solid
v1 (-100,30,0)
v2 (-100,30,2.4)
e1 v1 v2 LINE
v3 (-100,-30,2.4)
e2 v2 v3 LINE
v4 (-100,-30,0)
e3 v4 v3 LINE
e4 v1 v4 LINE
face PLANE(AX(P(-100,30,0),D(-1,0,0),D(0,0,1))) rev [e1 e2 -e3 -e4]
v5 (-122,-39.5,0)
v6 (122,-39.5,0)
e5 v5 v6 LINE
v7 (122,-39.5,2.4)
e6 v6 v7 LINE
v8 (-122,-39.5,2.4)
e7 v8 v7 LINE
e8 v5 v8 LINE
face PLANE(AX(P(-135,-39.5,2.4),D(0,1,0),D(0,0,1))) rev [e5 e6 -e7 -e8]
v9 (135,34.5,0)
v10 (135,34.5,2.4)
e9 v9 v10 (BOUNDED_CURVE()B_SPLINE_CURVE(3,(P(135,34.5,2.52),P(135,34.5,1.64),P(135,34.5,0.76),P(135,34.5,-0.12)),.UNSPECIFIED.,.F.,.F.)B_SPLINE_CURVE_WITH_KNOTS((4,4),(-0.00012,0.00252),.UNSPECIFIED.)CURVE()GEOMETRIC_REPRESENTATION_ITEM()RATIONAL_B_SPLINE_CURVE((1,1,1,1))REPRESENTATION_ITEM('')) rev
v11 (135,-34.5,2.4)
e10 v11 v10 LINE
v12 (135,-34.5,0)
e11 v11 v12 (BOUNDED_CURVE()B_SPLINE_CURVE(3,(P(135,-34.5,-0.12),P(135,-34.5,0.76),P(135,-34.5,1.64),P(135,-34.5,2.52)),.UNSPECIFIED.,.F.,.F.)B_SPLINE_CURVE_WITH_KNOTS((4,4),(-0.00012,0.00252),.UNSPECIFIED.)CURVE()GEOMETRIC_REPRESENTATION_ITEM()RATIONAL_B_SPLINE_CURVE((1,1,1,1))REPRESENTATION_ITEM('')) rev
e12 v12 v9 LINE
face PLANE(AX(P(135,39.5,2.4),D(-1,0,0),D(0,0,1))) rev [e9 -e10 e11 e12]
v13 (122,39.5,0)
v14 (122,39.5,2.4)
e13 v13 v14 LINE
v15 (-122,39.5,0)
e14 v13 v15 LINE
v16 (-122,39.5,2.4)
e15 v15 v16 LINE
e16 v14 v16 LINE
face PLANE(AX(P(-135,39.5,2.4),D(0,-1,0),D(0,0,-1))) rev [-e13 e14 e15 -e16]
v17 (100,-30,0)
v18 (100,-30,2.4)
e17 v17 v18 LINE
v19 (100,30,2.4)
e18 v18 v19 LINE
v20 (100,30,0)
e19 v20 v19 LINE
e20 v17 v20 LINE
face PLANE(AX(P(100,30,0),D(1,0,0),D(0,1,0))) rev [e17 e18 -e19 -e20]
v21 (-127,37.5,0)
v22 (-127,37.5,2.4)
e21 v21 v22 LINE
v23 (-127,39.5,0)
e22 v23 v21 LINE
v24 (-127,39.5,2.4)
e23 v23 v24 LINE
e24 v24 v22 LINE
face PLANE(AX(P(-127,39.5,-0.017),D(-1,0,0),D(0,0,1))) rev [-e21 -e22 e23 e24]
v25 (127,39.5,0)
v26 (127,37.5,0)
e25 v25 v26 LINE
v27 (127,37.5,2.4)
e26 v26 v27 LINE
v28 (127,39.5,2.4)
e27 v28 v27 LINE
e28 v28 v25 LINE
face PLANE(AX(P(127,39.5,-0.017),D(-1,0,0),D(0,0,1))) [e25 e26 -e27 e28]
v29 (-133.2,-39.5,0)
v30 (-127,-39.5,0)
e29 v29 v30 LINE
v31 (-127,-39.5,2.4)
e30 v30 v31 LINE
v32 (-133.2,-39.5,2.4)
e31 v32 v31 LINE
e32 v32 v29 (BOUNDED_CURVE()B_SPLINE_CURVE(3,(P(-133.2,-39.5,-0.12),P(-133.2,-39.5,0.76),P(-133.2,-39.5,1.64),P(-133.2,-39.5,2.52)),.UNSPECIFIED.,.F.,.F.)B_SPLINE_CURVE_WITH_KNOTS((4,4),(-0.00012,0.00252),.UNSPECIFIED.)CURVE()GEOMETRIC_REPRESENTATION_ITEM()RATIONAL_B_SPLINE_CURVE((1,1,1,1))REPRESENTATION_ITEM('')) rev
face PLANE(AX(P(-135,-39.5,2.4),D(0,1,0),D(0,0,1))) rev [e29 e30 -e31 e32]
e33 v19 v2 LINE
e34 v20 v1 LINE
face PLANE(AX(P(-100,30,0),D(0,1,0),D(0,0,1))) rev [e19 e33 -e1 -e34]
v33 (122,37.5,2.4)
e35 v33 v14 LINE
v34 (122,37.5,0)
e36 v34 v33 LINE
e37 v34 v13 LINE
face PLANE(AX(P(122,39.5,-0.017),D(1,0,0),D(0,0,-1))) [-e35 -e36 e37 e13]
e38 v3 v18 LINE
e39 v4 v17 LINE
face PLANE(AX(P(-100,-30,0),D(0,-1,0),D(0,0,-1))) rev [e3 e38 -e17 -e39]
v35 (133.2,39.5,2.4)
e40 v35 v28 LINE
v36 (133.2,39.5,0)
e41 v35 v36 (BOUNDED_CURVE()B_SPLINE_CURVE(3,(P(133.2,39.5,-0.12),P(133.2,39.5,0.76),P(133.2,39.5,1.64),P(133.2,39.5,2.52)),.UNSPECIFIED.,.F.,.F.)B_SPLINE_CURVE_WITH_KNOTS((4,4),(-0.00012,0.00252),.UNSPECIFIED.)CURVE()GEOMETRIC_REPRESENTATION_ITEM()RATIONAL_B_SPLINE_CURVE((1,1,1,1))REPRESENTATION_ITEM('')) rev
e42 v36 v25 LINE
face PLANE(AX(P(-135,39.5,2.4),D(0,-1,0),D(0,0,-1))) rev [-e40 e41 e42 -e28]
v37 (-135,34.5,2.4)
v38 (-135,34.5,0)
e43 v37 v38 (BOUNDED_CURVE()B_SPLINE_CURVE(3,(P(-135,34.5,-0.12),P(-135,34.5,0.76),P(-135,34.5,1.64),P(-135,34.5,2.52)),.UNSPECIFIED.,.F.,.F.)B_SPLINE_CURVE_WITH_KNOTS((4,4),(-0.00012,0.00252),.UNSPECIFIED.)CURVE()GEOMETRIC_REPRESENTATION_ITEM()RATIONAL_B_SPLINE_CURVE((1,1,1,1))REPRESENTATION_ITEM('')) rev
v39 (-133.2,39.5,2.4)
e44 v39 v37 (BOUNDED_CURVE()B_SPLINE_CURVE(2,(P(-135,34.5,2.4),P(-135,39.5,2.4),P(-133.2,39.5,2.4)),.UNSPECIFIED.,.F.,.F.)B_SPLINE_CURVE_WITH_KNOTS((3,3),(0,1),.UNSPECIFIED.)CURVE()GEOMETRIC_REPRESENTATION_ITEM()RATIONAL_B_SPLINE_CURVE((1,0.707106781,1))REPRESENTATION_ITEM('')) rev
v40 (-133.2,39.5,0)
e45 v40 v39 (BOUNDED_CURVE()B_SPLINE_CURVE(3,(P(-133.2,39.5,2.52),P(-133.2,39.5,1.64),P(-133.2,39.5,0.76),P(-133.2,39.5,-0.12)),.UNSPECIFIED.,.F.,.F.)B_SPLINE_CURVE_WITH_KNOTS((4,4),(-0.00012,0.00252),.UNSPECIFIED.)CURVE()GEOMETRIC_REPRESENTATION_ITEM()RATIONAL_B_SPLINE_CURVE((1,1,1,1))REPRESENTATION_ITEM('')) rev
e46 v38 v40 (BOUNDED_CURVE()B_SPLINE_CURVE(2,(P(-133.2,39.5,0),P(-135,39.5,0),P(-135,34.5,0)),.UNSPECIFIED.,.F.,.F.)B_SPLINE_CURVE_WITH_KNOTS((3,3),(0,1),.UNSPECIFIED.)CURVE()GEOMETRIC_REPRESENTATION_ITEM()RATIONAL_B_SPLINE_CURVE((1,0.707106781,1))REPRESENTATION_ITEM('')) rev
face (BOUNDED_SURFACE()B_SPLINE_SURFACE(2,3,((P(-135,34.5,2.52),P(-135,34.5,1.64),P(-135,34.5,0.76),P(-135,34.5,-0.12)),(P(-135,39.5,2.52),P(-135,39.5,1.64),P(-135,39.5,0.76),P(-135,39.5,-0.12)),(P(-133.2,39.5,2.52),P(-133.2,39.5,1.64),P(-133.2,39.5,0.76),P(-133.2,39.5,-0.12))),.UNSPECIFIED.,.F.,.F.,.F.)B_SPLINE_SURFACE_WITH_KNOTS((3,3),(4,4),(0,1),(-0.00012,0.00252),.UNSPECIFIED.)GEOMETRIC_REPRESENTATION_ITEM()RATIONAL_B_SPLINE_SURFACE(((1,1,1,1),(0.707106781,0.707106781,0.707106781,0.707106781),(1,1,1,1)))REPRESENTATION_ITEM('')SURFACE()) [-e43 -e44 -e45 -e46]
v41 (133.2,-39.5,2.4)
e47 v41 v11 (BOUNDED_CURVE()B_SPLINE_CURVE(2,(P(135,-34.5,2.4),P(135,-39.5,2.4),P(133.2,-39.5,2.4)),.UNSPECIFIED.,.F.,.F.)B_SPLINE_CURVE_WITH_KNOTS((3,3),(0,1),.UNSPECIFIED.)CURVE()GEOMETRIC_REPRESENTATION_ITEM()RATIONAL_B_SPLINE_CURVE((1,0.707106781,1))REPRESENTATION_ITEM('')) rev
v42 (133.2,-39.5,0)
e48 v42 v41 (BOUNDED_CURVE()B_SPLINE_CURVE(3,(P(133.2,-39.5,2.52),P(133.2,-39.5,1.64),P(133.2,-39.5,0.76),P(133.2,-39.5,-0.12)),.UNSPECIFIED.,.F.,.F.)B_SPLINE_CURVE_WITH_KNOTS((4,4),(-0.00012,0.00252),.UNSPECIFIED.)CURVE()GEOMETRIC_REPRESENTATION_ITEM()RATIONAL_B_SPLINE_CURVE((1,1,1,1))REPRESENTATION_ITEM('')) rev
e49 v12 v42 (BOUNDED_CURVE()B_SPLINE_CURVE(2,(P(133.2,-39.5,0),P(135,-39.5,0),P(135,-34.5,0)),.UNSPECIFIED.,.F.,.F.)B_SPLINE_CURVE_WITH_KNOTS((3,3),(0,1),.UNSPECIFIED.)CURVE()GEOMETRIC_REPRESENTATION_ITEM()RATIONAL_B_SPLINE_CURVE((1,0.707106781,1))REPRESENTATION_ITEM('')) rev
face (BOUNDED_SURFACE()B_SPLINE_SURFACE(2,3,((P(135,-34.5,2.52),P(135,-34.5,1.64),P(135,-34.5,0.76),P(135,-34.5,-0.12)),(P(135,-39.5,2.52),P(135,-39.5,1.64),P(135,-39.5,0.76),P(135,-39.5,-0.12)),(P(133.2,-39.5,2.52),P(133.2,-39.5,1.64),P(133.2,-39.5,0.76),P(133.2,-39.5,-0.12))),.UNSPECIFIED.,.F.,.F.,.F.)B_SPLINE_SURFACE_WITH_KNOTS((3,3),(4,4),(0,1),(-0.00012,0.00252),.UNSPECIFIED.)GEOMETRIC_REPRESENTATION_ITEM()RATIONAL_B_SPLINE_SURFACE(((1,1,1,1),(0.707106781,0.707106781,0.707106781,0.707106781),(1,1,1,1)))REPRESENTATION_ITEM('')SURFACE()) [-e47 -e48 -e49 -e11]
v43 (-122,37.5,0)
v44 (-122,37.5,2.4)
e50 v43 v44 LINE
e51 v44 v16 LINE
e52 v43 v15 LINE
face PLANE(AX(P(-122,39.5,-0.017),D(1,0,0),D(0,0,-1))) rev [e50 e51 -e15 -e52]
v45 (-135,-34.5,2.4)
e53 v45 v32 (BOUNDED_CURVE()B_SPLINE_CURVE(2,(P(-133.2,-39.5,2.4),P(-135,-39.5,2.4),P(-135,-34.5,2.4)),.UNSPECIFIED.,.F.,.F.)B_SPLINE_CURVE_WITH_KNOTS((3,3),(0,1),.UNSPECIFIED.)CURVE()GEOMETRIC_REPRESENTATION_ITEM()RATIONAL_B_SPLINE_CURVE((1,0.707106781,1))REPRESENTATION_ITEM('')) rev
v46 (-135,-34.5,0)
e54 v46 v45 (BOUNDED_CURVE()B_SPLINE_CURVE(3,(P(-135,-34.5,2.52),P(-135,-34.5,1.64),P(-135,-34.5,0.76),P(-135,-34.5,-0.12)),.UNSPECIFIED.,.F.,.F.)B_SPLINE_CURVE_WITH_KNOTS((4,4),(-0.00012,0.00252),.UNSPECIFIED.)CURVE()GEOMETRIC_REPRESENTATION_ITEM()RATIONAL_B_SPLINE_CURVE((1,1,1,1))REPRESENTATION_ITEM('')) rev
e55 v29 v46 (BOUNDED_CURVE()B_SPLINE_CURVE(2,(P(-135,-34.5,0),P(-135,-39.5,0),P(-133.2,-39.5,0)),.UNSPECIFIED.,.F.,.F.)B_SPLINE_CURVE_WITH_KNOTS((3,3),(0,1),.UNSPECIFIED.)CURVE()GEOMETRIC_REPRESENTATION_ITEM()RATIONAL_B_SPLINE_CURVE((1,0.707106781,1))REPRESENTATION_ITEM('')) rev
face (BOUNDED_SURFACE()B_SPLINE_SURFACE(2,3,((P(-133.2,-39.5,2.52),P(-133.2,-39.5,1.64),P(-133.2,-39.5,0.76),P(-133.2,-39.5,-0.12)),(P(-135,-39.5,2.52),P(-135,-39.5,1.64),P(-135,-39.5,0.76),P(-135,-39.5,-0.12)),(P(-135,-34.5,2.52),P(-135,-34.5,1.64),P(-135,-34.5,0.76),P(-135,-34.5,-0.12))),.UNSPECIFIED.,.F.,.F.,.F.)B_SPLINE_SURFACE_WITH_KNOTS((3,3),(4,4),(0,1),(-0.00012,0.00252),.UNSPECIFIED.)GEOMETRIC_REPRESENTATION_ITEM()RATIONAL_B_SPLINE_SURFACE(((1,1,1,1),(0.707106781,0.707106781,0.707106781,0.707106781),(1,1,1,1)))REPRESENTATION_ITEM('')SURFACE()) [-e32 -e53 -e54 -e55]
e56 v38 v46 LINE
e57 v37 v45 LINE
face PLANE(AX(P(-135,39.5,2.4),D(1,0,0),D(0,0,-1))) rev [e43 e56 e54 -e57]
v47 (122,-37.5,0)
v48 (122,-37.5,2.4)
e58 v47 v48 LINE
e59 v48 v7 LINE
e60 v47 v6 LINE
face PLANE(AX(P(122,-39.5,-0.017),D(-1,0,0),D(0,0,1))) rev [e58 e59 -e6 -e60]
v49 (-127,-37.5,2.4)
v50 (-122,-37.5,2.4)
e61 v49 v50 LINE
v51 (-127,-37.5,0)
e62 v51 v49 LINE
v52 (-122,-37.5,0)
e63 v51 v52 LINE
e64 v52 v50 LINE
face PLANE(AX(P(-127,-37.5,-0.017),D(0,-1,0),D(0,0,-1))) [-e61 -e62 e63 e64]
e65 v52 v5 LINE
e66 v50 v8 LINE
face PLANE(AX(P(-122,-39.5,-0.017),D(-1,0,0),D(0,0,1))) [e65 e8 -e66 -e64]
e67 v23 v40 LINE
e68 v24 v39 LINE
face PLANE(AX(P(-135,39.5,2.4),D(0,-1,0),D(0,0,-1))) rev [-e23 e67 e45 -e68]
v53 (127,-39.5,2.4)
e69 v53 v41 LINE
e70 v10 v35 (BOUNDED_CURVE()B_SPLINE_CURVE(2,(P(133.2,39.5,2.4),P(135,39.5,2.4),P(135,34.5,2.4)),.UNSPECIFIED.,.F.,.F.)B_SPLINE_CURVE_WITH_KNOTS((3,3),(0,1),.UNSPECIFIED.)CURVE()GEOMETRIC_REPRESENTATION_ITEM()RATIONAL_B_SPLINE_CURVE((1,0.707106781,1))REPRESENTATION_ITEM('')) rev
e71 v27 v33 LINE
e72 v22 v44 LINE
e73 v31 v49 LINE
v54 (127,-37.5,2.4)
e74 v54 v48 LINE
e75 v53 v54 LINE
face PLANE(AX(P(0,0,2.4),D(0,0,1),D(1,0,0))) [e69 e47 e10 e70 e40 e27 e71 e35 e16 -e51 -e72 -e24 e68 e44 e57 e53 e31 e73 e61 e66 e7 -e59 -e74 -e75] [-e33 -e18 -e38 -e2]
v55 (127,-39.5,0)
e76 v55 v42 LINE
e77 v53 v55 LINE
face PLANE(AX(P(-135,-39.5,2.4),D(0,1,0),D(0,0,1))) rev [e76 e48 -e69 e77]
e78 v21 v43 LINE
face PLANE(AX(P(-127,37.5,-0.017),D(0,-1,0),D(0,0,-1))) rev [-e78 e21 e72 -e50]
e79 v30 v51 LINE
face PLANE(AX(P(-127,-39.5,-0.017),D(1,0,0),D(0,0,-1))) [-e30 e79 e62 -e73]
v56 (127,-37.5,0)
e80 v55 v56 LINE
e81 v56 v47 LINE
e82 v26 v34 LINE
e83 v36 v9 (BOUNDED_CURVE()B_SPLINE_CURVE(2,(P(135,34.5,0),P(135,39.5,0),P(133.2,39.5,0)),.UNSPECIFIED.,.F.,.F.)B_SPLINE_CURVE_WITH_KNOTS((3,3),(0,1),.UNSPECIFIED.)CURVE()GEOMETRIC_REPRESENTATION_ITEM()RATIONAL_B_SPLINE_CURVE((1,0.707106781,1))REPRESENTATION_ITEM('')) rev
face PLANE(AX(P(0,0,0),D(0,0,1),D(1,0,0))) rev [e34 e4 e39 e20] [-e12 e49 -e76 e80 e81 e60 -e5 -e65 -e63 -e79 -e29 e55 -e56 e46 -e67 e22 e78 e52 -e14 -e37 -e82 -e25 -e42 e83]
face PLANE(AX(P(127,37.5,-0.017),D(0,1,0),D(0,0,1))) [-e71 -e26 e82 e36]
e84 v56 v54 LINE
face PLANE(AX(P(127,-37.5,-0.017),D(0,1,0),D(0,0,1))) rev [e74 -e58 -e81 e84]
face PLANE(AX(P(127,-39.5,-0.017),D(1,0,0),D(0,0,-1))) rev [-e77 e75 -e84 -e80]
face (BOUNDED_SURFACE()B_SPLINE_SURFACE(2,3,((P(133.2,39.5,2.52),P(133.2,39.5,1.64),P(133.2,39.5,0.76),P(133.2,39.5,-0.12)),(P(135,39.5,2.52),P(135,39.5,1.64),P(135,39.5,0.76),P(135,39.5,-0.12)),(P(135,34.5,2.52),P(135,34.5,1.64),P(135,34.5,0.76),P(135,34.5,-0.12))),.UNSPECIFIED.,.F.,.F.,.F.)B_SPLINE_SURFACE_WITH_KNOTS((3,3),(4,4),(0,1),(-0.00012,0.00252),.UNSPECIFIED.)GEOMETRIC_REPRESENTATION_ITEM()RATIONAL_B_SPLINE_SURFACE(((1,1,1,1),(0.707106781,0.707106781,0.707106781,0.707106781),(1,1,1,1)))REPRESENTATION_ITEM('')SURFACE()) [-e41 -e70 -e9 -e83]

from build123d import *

# Parameters (mm, degrees)
SKETCH_1_W               = 270
SKETCH_1_H               = 79
EXTRUDE_1_DEPTH          = 2.4
SKETCH_2_W               = 200
SKETCH_2_H               = 60
CUT_EXTRUDE_1_DEPTH      = 141.680524594
FILLET_1_SIZE            = 5
FILLET_1_SIZE_2          = 1.8
SKETCH_3_W               = 5
SKETCH_3_H               = 2
CUT_EXTRUDE_2_DEPTH      = 141.68052472
MIRROR_2_COPY_1_SKETCH_W = 5
MIRROR_2_COPY_1_SKETCH_H = 2
MIRROR_2_COPY_1_DEPTH    = 141.68052472


with BuildPart() as part:
    # 草图1 → 凸台-拉伸1 (new body)
    with BuildSketch(Plane.XY):
        Rectangle(SKETCH_1_W, SKETCH_1_H)
    extrude(amount=EXTRUDE_1_DEPTH)

    # 草图2 → 切除-拉伸1 (cut, through all)
    with BuildSketch(Plane.XY.offset(2.4)):
        Rectangle(SKETCH_2_W, SKETCH_2_H)
    extrude(amount=-CUT_EXTRUDE_1_DEPTH, mode=Mode.SUBTRACT)

    # 圆角1
    # an asymmetric fillet: 5, 1.8 mm, written as the material it takes off along each edge
    with BuildSketch(Plane(origin=(135, -39.5, -12.5), x_dir=(0, 1, 0), z_dir=(0, 0, 1))) as fillet_1_piece_1:
        with BuildLine():
            Bezier((FILLET_1_SIZE, 0), (0, 0), (0, FILLET_1_SIZE_2), weights=[1, 0.707106781, 1])
            Line((0, FILLET_1_SIZE_2), (0, 0))
            Line((0, 0), (FILLET_1_SIZE, 0))
        make_face()
    extrude(amount=27.4, mode=Mode.SUBTRACT)
    with BuildSketch(Plane(origin=(135, 39.5, -12.5), x_dir=(-1, 0, 0), z_dir=(0, 0, 1))) as fillet_1_piece_2:
        with BuildLine():
            Bezier((FILLET_1_SIZE_2, 0), (0, 0), (0, FILLET_1_SIZE), weights=[1, 0.707106781, 1])
            Line((0, FILLET_1_SIZE), (0, 0))
            Line((0, 0), (FILLET_1_SIZE_2, 0))
        make_face()
    extrude(amount=27.4, mode=Mode.SUBTRACT)
    with BuildSketch(Plane(origin=(-135, -39.5, -12.5), x_dir=(0, 1, 0), z_dir=(0, 0, 1))) as fillet_1_piece_3:
        with BuildLine():
            Bezier((FILLET_1_SIZE, 0), (0, 0), (0, -FILLET_1_SIZE_2), weights=[1, 0.707106781, 1])
            Line((0, -FILLET_1_SIZE_2), (0, 0))
            Line((0, 0), (FILLET_1_SIZE, 0))
        make_face()
    extrude(amount=27.4, mode=Mode.SUBTRACT)
    with BuildSketch(Plane(origin=(-135, 39.5, -12.5), x_dir=(1, 0, 0), z_dir=(0, 0, 1))) as fillet_1_piece_4:
        with BuildLine():
            Bezier((FILLET_1_SIZE_2, 0), (0, 0), (0, -FILLET_1_SIZE), weights=[1, 0.707106781, 1])
            Line((0, -FILLET_1_SIZE), (0, 0))
            Line((0, 0), (FILLET_1_SIZE_2, 0))
        make_face()
    extrude(amount=27.4, mode=Mode.SUBTRACT)

    # 草图3 → 切除-拉伸2 (cut, through all)
    with BuildSketch(Plane.XY.offset(2.4)):
        with Locations((-124.5, 38.5)):
            Rectangle(SKETCH_3_W, SKETCH_3_H)
    cut_extrude_2 = extrude(amount=-CUT_EXTRUDE_2_DEPTH, mode=Mode.SUBTRACT)

    # 镜向1: 切除-拉伸2 across plane
    add(cut_extrude_2.mirror(Plane.ZX), mode=Mode.SUBTRACT)

    # 镜向2: 切除-拉伸2 across plane
    add(cut_extrude_2.mirror(Plane(origin=(0, 0, 0), x_dir=(0, 0, 1), z_dir=(1, 0, 0))), mode=Mode.SUBTRACT)

    # 镜向2 copy 1 sketch → 镜向2 copy 1 (cut, through all)
    with BuildSketch(Plane(origin=(0, 0, 2.4), x_dir=(-1, 0, 0), z_dir=(0, 0, 1))):
        with Locations((-124.5, 38.5)):
            Rectangle(MIRROR_2_COPY_1_SKETCH_W, MIRROR_2_COPY_1_SKETCH_H)
    extrude(amount=-MIRROR_2_COPY_1_DEPTH, mode=Mode.SUBTRACT)


solid = part.part
